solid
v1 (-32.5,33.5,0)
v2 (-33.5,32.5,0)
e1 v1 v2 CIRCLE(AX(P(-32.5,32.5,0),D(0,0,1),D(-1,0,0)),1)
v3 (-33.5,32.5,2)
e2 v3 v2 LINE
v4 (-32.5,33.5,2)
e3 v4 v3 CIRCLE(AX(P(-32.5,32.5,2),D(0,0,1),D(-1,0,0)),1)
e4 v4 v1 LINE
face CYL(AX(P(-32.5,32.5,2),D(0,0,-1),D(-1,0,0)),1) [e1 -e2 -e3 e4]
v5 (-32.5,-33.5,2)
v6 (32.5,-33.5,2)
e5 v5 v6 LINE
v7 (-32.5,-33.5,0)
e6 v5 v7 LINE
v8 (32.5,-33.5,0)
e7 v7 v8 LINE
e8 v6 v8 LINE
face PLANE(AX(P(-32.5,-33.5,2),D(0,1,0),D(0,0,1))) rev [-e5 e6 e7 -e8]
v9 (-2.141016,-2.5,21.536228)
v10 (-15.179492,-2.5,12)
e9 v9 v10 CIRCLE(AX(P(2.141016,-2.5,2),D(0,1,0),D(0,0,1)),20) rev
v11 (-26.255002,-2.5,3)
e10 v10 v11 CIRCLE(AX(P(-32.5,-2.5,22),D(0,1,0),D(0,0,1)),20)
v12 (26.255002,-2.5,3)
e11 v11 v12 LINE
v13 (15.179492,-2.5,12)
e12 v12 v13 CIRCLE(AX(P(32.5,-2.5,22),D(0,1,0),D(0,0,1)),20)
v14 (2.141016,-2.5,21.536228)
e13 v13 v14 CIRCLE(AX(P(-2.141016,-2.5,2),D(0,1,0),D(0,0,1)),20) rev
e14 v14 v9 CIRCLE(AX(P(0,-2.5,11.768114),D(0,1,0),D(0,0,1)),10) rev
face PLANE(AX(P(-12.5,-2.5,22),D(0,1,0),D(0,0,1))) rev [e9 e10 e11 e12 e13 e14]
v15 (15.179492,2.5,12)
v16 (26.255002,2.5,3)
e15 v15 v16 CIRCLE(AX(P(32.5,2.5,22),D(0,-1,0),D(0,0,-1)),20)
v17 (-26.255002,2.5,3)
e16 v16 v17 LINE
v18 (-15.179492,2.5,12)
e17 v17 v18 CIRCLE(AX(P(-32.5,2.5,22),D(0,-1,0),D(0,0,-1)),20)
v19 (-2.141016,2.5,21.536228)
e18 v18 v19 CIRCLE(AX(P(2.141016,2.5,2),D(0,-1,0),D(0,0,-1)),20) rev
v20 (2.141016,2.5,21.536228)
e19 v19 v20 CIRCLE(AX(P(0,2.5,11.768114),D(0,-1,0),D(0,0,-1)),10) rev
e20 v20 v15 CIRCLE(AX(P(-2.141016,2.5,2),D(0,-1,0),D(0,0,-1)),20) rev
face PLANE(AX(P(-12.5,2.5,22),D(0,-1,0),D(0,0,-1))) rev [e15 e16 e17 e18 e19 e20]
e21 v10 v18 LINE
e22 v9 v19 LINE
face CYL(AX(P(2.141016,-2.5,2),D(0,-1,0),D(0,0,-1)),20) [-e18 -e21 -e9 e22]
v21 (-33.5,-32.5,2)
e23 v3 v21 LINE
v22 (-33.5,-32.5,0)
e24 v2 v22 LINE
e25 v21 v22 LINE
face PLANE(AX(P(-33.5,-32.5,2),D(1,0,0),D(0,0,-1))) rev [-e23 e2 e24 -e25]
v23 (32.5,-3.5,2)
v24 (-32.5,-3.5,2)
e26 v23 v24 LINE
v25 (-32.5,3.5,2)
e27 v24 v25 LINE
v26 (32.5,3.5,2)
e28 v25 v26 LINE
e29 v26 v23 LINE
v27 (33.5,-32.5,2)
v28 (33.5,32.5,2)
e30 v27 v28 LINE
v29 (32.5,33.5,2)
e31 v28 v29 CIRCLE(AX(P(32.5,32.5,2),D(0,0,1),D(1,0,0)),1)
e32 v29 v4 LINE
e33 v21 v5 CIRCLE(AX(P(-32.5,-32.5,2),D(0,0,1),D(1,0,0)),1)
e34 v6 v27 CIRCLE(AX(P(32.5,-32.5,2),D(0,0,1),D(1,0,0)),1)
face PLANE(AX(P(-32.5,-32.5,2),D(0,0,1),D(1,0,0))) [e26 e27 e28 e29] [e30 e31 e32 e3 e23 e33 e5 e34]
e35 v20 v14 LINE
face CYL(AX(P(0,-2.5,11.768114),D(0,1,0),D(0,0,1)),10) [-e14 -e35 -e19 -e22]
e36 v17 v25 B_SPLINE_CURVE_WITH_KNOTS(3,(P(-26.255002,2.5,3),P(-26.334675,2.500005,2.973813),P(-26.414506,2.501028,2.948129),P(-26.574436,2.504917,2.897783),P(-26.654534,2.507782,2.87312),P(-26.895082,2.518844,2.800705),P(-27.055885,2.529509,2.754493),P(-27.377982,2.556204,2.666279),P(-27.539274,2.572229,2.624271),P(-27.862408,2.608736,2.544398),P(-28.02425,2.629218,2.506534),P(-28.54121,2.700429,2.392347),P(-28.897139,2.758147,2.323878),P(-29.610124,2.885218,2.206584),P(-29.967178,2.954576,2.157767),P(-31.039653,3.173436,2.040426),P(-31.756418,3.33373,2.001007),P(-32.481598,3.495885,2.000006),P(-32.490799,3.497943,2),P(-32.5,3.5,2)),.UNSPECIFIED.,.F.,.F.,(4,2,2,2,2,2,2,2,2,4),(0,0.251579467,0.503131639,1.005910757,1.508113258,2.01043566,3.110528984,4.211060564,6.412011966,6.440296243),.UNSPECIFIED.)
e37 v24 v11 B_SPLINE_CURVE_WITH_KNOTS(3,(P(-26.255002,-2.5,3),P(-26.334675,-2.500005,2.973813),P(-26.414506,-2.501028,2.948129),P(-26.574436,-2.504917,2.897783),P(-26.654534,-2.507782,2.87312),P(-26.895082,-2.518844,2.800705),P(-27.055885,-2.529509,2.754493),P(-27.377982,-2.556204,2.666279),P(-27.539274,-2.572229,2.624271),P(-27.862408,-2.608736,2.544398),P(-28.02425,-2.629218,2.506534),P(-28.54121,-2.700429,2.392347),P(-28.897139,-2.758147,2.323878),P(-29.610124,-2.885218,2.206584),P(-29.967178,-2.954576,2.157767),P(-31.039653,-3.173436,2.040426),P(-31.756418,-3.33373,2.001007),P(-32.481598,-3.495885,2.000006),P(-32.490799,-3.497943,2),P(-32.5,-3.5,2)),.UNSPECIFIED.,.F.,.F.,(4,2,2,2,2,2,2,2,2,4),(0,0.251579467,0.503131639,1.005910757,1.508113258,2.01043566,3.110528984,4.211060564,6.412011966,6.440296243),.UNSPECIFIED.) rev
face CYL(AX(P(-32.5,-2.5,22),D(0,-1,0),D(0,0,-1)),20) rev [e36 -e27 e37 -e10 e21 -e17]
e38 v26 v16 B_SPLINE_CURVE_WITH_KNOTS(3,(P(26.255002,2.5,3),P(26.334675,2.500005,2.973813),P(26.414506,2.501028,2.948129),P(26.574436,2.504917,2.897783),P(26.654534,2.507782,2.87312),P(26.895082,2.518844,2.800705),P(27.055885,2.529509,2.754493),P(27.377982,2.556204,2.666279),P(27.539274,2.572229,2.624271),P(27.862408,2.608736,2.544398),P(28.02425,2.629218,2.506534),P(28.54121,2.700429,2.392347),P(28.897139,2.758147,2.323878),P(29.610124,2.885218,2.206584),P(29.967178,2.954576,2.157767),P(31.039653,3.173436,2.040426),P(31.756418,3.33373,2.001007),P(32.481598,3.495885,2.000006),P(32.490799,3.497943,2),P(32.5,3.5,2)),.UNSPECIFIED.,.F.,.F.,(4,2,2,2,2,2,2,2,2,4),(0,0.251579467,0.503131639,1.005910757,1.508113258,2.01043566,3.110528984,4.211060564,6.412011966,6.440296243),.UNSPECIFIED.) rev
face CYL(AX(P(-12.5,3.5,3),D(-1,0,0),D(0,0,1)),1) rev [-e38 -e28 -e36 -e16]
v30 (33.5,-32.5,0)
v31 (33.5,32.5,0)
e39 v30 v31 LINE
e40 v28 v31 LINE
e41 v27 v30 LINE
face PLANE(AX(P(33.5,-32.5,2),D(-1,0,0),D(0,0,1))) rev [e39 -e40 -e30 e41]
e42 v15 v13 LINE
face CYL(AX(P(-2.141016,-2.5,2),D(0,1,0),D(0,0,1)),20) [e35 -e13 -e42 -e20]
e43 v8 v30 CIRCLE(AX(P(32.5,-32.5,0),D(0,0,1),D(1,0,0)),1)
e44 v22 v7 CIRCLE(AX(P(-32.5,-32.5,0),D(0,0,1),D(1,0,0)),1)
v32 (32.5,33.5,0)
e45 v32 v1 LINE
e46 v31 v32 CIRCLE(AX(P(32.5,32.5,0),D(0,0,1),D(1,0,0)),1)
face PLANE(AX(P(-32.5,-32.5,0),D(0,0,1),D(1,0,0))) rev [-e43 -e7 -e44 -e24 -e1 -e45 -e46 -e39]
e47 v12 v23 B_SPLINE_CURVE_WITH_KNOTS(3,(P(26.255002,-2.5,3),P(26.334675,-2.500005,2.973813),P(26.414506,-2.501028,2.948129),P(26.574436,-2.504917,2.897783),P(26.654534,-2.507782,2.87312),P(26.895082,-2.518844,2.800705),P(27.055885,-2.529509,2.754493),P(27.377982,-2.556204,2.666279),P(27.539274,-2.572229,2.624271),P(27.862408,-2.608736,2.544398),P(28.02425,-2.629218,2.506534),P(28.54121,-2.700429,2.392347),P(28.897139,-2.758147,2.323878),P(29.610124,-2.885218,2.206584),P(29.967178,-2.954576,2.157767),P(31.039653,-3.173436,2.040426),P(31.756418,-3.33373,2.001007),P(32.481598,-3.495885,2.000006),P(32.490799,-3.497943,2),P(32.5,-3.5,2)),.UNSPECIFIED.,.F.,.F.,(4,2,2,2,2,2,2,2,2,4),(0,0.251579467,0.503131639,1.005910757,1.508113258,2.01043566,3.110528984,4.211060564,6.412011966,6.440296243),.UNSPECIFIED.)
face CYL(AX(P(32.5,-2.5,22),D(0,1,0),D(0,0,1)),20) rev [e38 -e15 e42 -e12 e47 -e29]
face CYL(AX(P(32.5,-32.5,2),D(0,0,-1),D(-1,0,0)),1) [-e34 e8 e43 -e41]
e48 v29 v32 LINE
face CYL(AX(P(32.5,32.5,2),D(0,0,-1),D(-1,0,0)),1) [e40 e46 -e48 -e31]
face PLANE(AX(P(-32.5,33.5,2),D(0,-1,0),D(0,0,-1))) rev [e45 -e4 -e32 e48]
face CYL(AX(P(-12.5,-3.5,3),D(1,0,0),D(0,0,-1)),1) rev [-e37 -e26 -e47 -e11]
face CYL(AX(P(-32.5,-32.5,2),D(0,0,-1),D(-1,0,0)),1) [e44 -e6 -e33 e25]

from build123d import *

# Parameters (mm, degrees)
AUFSATZ_LINEAR_AUSTRAGEN1_DEPTH = 2
SKIZZE2_W                       = 25
SKIZZE2_H                       = 5
AUFSATZ_LINEAR_AUSTRAGEN2_DEPTH = 20
VERRUNDUNG1_R                   = 20
VERRUNDUNG2_R                   = 1
VERRUNDUNG3_R                   = 20
VERRUNDUNG4_R                   = 10


# Some blends are built 0.0001 mm under size
with BuildPart() as part:
    # Skizze1 → Aufsatz-Linear austragen1 (new body)
    with BuildSketch(Plane.XY):
        with BuildLine():
            Line((-32.5, -33.5), (32.5, -33.5))
            ThreePointArc((32.5, -33.5), (33.207106781, -33.207106781), (33.5, -32.5))
            Line((33.5, -32.5), (33.5, 32.5))
            ThreePointArc((33.5, 32.5), (33.207106781, 33.207106781), (32.5, 33.5))
            Line((32.5, 33.5), (-32.5, 33.5))
            ThreePointArc((-32.5, 33.5), (-33.207106781, 33.207106781), (-33.5, 32.5))
            Line((-33.5, 32.5), (-33.5, -32.5))
            ThreePointArc((-33.5, -32.5), (-33.207106781, -33.207106781), (-32.5, -33.5))
        make_face()
    extrude(amount=AUFSATZ_LINEAR_AUSTRAGEN1_DEPTH)

    # Skizze2 → Aufsatz-Linear austragen2 (add)
    with BuildSketch(Plane.XY.offset(2)):
        Rectangle(SKIZZE2_W, SKIZZE2_H)
    extrude(amount=AUFSATZ_LINEAR_AUSTRAGEN2_DEPTH)

    # Verrundung1
    verrundung1_edges = [part.edges().sort_by_distance(p)[0] for p in [
        (-12.5, 0, 2),
        (12.5, 0, 2),
    ]]
    fillet(verrundung1_edges, radius=VERRUNDUNG1_R - 0.0001)  # a hair under: the kernel refuses the full size

    # Verrundung2
    verrundung2_edges = [part.edges().sort_by_distance(p)[0] for p in [
        (0, 2.5, 2),
        (0, -2.5, 2),
    ]]
    fillet(verrundung2_edges, radius=VERRUNDUNG2_R)

    # Verrundung3
    # the kernel refuses this fillet: 20 mm, written as the material it takes off along each edge
    with BuildSketch(Plane(origin=(-12.5, 39.102646041, 22), x_dir=(1, 0, 0), z_dir=(0, -1, 0)), Plane(origin=(12.5, -39.102646041, 22), x_dir=(-1, 0, 0), z_dir=(0, 1, 0))) as verrundung3_piece_1:
        with BuildLine():
            CenterArc((14.641058416, -20), VERRUNDUNG3_R, 90, 60.0000827)
            Line((-2.679464093, -10.000025), (-4.411516344, -9.0000275))
            ThreePointArc((-4.411516344, -9.0000275), (-2, -0.0001), (-2, 0))
            Line((-2, 0), (0, 2))
            Line((0, 2), (14.641058416, 2))
            Line((14.641058416, 2), (14.641058416, 0))
        make_face()
    extrude(amount=78.205292082, mode=Mode.SUBTRACT)

    # Verrundung4
    verrundung4_edges = [part.edges().sort_by_distance(p)[0] for p in [
        (0, 0, 21.885066479),
    ]]
    fillet(verrundung4_edges, radius=VERRUNDUNG4_R)


solid = part.part
